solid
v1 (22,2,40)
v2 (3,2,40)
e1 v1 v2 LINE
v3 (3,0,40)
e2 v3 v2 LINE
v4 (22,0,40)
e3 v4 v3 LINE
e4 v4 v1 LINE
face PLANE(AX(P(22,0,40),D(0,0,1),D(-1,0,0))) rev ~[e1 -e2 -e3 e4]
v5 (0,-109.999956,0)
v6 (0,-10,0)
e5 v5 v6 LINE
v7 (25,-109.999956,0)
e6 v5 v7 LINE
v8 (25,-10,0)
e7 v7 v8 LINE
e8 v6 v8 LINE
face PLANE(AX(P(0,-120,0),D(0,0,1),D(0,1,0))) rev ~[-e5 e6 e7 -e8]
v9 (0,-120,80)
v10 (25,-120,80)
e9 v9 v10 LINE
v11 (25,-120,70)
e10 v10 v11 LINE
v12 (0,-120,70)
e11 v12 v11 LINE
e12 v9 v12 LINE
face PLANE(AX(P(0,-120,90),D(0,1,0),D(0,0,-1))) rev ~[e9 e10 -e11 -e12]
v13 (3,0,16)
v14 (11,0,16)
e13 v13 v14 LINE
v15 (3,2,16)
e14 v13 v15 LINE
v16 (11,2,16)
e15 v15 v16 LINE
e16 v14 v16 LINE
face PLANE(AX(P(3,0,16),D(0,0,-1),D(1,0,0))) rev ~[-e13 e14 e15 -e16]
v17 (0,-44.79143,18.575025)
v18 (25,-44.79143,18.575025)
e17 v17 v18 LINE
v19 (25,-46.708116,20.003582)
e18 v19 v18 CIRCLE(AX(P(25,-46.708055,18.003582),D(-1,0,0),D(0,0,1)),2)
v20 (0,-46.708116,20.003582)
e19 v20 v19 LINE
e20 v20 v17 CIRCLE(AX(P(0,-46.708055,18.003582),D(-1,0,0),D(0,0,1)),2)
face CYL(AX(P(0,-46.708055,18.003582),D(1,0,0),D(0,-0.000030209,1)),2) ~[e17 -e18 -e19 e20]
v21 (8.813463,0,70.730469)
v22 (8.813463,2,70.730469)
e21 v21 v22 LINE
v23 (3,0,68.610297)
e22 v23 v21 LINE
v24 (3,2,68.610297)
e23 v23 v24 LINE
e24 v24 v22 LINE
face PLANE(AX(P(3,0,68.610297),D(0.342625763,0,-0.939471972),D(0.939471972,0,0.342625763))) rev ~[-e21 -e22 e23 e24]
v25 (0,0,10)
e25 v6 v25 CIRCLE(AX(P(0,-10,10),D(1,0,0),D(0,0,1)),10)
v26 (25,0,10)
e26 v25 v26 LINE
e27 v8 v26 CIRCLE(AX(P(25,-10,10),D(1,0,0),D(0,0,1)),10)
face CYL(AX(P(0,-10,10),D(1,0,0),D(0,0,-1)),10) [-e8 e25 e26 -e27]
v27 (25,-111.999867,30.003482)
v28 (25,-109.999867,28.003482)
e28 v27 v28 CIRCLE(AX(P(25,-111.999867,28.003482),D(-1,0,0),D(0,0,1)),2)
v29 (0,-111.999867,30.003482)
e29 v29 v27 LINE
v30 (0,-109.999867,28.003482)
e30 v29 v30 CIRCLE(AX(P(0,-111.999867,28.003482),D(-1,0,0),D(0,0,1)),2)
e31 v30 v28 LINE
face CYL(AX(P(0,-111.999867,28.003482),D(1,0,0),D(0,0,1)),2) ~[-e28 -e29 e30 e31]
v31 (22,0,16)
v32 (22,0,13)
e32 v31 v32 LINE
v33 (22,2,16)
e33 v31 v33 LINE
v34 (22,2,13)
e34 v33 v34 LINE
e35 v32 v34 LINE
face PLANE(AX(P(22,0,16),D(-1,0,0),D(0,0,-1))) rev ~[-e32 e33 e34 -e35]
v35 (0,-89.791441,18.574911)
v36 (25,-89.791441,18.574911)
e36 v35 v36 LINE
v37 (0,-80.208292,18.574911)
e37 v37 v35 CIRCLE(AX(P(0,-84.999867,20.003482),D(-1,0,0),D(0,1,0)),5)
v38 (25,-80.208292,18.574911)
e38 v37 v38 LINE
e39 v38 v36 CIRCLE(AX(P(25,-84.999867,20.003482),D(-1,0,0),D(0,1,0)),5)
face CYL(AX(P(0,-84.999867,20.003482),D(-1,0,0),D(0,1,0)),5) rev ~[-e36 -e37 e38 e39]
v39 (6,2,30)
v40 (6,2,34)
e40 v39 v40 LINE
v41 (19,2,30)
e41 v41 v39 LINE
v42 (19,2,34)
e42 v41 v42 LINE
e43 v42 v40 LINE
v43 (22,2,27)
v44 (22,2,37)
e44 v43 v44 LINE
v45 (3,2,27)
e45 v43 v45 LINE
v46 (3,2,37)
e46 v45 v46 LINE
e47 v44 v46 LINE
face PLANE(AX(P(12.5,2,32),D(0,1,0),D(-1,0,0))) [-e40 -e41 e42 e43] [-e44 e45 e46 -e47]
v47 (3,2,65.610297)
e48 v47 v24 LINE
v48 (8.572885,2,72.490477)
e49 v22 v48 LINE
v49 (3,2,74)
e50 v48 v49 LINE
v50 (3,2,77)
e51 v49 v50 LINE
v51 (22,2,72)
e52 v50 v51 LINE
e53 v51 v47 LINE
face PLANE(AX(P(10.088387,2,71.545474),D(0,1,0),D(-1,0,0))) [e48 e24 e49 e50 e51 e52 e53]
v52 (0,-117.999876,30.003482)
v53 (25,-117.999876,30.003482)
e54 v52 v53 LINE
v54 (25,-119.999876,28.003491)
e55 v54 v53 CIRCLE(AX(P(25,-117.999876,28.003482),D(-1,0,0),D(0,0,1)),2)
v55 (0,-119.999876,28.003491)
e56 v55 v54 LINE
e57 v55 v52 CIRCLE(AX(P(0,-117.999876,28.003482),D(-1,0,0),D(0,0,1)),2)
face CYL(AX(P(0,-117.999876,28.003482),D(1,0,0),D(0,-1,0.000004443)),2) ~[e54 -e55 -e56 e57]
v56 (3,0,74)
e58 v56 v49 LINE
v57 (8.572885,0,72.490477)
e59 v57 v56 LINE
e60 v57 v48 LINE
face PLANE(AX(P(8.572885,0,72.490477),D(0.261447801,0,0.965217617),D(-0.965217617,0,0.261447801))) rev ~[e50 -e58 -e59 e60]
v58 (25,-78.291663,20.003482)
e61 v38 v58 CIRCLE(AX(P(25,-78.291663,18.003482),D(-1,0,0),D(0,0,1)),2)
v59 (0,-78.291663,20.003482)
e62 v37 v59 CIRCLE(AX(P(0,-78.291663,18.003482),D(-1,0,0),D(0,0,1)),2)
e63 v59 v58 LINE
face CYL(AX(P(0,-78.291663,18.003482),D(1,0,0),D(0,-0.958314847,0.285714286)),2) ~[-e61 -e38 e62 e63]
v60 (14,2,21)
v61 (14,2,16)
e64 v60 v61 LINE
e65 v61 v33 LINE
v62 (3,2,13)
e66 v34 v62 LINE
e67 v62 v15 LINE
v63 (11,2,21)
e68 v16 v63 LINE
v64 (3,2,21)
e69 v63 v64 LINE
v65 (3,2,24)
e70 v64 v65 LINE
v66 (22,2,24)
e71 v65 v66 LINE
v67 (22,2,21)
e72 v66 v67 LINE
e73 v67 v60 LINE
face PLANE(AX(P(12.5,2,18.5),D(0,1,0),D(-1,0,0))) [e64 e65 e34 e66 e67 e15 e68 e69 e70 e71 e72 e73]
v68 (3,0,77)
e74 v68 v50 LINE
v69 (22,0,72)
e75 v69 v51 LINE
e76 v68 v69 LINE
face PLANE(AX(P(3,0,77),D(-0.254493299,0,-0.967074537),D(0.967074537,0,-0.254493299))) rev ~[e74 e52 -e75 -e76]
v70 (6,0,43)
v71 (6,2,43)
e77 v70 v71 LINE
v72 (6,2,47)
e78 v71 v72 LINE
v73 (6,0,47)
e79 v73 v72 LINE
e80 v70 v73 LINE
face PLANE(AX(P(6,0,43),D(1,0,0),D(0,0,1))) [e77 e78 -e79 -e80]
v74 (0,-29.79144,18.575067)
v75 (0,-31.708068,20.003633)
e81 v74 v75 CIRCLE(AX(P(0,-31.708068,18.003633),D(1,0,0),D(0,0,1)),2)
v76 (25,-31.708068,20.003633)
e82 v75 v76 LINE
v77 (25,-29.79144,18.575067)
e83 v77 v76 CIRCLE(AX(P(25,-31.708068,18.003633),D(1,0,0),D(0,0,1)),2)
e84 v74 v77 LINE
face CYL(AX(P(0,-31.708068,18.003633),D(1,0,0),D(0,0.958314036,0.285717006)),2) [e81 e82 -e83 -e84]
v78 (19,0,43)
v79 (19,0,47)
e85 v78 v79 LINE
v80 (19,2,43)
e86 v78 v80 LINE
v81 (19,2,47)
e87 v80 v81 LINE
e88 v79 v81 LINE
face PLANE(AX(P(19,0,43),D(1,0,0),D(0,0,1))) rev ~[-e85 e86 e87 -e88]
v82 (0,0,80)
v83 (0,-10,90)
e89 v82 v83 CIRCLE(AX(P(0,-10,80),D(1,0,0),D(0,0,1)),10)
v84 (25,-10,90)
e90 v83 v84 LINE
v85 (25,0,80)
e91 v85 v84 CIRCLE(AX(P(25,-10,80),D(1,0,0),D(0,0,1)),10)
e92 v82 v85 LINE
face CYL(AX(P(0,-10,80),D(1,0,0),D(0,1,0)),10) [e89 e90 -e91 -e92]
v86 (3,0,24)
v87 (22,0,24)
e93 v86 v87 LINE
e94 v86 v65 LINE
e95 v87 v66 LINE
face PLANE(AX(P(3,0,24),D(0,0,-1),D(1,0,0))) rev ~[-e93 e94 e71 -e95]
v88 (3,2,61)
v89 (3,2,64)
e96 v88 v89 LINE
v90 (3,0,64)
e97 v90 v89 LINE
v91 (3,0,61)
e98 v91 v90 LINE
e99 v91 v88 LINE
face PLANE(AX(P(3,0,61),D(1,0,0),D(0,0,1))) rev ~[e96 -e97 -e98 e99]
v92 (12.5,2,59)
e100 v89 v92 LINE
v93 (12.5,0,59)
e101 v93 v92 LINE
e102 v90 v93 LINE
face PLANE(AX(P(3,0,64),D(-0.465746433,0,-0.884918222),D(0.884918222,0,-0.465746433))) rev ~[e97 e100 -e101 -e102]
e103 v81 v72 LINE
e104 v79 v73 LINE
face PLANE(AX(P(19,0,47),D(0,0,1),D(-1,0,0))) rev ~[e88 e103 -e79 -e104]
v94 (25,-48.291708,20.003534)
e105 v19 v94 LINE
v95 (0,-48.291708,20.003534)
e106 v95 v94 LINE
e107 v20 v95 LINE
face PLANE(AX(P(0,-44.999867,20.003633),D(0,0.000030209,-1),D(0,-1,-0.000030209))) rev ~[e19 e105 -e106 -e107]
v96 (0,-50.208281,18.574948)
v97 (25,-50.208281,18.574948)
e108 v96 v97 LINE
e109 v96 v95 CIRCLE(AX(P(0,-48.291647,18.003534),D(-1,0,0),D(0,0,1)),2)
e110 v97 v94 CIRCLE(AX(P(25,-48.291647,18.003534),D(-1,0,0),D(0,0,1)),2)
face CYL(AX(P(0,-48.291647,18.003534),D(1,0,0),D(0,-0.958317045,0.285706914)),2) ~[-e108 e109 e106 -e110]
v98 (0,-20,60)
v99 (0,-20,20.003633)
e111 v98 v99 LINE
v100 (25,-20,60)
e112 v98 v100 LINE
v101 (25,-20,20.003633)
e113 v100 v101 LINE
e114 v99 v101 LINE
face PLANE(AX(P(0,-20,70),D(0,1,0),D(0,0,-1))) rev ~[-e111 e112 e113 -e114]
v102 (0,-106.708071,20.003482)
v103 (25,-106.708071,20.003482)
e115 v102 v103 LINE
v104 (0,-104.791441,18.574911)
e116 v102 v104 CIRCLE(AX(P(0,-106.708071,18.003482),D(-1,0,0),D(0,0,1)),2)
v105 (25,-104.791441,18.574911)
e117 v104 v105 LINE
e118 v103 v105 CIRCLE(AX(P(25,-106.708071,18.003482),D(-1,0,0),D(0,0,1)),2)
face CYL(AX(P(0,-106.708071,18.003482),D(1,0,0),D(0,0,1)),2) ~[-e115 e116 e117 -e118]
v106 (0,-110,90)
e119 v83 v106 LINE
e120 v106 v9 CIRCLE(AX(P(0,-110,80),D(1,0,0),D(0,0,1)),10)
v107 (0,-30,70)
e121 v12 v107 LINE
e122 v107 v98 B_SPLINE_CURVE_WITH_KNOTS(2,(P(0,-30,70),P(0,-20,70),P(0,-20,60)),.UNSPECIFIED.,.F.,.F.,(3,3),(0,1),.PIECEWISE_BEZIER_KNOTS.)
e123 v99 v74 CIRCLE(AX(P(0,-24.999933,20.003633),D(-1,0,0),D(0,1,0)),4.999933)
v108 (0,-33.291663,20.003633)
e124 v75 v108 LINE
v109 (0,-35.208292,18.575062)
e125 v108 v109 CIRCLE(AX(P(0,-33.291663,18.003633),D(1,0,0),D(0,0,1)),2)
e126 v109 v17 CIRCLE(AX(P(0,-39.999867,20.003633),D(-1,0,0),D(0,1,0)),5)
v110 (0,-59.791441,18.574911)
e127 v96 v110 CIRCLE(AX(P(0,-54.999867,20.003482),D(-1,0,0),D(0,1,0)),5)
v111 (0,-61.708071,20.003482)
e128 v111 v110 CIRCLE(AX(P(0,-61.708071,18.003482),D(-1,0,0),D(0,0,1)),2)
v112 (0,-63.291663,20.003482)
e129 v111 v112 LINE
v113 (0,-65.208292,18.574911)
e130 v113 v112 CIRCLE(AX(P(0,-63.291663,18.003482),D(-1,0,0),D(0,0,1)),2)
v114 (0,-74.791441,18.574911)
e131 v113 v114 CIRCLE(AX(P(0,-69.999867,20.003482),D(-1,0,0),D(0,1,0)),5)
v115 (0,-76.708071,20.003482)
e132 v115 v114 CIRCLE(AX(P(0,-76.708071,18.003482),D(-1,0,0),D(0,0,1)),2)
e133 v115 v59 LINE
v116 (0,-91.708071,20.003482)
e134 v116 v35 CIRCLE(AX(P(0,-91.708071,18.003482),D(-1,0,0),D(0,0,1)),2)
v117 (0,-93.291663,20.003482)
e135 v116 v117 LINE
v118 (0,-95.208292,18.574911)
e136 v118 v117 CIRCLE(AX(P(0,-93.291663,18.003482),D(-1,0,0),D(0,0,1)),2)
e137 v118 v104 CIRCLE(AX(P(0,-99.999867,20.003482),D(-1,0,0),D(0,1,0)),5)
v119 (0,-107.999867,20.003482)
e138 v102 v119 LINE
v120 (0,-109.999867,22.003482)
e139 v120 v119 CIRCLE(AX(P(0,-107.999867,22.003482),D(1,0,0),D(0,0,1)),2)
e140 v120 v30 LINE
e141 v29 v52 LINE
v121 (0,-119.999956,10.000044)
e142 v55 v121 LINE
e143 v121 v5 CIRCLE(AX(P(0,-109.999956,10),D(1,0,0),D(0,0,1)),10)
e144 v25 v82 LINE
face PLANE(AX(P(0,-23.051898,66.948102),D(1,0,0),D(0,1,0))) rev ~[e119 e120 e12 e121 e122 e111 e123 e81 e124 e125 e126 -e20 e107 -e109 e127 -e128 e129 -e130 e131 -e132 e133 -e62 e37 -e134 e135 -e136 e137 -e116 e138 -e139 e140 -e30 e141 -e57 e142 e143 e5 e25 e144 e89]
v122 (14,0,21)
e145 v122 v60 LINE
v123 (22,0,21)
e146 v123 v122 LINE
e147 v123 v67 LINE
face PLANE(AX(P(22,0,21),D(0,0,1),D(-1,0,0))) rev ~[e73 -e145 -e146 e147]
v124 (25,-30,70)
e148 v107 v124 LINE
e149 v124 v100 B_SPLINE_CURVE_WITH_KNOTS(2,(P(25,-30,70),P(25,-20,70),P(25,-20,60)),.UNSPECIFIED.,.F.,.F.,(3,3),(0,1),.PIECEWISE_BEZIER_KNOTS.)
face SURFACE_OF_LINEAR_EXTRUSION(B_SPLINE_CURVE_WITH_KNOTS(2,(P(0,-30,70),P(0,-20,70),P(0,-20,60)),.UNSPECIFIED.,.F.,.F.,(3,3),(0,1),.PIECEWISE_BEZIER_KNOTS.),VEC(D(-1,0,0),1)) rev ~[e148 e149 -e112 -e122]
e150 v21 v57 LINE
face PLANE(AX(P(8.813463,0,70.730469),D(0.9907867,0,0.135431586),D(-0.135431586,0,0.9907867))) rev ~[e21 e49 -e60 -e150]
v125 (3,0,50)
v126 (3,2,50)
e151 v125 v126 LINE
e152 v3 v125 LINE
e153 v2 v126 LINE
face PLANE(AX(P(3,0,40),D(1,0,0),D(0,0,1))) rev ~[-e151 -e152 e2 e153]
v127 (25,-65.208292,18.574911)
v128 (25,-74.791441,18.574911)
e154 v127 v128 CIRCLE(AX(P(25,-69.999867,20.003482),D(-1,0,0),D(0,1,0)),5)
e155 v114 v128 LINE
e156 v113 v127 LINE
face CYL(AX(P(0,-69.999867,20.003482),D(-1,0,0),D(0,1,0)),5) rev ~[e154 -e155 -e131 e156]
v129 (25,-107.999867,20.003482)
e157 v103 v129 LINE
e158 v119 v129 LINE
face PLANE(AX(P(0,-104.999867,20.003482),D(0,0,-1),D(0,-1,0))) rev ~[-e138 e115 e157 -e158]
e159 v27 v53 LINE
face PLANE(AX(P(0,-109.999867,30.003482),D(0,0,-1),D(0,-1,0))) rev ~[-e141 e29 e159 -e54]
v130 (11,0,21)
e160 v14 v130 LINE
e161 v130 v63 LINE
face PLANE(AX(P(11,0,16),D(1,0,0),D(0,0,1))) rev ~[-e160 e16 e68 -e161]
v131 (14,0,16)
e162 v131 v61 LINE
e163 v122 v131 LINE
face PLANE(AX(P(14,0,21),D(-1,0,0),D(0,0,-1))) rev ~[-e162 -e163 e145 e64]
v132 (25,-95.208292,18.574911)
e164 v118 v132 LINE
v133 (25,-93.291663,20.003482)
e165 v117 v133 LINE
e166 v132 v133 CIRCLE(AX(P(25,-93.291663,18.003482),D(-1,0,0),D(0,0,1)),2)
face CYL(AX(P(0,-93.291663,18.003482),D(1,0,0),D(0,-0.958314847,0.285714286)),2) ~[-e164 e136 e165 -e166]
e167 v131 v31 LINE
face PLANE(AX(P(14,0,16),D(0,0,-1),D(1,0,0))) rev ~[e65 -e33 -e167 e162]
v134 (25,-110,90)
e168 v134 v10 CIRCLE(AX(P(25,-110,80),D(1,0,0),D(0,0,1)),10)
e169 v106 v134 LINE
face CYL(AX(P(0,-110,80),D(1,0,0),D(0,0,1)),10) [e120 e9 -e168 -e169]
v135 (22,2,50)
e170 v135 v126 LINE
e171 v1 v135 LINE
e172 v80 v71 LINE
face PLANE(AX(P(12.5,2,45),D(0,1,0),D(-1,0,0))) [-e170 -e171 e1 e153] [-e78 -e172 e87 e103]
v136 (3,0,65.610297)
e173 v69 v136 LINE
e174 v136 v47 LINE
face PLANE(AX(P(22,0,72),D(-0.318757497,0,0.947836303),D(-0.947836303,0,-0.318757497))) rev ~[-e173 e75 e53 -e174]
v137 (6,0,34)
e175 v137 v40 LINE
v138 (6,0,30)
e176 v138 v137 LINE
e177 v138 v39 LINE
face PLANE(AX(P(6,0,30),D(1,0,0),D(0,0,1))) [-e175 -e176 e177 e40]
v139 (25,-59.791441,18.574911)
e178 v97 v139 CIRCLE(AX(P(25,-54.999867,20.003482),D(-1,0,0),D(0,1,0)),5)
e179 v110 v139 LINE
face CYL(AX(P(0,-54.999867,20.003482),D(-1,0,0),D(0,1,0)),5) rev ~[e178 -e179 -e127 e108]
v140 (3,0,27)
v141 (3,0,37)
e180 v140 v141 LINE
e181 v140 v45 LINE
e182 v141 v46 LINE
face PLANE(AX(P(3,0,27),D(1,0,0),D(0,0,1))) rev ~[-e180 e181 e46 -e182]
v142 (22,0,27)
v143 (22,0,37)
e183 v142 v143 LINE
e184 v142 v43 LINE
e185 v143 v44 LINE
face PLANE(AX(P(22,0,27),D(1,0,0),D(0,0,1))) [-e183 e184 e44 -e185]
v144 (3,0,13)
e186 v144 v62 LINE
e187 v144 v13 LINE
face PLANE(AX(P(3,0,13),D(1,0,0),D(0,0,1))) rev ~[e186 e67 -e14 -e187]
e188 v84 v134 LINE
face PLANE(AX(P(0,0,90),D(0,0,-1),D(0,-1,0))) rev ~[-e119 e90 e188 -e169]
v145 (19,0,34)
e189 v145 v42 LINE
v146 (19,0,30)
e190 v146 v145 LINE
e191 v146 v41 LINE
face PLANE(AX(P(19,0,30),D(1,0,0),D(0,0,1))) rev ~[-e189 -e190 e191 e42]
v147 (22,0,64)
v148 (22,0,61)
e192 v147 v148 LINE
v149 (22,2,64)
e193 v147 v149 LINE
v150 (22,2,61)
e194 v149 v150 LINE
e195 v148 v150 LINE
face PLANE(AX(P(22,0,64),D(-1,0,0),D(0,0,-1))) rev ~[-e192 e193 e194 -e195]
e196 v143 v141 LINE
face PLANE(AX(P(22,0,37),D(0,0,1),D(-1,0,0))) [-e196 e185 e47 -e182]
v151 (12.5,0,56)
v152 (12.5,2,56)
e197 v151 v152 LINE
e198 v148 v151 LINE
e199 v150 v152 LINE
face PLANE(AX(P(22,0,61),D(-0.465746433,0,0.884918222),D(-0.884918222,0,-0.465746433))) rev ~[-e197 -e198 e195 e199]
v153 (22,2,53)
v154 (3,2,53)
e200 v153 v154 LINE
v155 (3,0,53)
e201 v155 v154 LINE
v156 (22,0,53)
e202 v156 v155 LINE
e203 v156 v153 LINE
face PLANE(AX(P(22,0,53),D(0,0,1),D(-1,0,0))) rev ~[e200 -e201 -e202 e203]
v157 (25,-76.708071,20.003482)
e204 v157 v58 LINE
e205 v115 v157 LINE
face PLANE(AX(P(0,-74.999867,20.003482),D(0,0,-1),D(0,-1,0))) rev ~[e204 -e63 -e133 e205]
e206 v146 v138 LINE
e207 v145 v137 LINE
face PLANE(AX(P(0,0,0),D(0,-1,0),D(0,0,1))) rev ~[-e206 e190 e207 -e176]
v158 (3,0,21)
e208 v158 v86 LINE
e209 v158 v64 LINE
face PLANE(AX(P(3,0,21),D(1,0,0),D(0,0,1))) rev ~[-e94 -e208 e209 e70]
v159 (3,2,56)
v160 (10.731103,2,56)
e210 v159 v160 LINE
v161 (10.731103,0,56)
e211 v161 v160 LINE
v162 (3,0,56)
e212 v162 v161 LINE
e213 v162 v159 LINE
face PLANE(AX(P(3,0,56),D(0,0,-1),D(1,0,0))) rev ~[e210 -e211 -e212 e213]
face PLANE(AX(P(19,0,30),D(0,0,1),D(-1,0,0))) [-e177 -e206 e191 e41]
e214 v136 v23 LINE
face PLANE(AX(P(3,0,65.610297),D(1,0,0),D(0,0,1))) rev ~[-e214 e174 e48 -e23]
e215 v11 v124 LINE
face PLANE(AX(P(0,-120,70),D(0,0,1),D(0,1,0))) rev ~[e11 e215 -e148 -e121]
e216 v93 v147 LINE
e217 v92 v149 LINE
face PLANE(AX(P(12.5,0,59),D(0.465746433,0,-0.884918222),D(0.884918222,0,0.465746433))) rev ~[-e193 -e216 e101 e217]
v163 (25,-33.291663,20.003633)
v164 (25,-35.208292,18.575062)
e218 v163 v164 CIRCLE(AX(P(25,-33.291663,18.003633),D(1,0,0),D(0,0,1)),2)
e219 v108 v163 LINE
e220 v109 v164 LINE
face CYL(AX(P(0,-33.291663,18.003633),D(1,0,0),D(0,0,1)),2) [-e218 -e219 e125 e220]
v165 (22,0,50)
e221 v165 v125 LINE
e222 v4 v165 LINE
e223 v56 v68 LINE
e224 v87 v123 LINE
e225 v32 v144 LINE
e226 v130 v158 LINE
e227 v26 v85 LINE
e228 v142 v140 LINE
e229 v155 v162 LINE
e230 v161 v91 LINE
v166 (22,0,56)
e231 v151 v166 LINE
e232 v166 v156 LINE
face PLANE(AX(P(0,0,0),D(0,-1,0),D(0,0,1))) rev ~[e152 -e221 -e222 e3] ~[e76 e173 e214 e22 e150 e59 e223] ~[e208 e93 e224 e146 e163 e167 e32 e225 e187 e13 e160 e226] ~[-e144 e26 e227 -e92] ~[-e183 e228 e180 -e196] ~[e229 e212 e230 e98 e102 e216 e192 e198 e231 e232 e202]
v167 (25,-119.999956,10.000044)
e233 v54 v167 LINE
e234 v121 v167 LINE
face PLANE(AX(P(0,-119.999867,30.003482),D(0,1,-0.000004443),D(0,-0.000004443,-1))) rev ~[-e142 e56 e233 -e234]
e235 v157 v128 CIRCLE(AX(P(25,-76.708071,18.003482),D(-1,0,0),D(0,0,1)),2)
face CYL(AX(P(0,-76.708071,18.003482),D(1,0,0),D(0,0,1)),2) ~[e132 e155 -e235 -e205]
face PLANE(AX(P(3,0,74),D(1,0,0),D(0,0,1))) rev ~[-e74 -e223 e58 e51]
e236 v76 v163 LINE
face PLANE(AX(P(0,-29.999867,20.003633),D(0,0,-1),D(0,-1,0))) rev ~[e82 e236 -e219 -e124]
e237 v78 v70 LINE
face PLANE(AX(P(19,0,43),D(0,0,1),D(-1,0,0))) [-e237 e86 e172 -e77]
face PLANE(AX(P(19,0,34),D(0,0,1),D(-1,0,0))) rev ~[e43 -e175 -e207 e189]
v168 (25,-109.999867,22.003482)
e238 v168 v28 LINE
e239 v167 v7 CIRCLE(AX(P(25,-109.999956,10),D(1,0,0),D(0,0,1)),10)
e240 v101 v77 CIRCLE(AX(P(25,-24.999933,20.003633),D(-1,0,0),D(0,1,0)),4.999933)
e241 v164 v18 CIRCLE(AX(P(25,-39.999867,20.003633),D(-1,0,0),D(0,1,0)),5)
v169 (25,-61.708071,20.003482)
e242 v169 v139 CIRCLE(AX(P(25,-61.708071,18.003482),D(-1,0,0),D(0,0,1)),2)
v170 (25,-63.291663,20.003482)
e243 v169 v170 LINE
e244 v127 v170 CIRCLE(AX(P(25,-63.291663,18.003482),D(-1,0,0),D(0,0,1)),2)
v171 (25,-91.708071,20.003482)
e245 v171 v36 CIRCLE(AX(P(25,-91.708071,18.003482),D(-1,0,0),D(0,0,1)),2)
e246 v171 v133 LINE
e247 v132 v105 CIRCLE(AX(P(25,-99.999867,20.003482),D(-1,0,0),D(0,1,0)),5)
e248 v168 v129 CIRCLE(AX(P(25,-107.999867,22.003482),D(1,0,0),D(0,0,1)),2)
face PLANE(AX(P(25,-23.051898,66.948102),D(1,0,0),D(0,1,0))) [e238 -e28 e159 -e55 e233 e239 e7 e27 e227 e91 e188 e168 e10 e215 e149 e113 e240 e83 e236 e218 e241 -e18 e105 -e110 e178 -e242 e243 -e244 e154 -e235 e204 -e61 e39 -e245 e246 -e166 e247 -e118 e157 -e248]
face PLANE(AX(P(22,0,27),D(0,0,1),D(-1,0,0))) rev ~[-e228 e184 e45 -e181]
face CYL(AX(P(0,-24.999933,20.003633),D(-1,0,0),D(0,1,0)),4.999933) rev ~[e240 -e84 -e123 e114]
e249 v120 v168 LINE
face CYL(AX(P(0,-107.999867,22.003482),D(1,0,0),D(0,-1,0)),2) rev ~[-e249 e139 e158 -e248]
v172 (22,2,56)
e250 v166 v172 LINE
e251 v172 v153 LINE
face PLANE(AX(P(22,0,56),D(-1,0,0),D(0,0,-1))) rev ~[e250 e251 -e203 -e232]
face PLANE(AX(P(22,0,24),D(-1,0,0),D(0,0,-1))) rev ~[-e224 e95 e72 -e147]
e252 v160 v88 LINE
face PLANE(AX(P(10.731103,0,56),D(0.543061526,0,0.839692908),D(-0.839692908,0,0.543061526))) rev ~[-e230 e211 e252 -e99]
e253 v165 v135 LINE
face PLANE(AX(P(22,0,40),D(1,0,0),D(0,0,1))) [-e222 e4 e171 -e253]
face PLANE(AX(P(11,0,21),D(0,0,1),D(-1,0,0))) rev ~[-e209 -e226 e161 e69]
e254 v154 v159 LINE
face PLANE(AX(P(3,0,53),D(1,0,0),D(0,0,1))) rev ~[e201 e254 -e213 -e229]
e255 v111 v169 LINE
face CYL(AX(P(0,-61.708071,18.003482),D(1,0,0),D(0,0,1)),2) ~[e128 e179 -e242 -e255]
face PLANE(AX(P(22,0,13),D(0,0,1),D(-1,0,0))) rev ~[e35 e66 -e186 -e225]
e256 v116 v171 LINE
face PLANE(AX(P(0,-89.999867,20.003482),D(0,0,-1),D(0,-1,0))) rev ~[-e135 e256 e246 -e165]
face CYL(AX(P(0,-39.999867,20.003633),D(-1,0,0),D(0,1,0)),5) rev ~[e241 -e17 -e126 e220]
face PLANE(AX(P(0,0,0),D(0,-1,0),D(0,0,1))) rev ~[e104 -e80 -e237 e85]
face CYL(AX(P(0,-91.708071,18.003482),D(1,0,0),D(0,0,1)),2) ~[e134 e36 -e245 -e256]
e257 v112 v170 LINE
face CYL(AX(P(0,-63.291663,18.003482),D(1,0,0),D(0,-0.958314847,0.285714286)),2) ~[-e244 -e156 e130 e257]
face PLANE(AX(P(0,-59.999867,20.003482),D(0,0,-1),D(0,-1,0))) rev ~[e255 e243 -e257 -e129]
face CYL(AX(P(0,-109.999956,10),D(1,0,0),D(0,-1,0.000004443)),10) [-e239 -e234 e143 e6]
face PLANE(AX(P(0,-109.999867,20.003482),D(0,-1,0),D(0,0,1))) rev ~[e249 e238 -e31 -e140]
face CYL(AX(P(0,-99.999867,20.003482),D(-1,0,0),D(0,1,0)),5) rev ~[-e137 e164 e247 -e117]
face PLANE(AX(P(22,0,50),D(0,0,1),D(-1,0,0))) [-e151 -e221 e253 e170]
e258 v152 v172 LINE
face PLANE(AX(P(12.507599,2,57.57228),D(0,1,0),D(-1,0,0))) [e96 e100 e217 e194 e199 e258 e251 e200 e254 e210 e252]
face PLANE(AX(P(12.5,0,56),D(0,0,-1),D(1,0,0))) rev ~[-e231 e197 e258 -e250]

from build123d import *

# Parameters (mm, degrees)
F1_DEPTH    = 25
F2_R        = 10
F3_T1_DEPTH = 25
F4_R        = 2
F5_W        = 19
F5_H        = 10
F5_W_2      = 13
F5_H_2      = 4
F6_DEPTH    = 2


# Not quite as in the source:
# - a fillet or chamfer that OpenCascade refuses, or shapes differently, is made with other operations: its cross-section is extruded or revolved along the edge and cut away or added


with BuildPart() as f1:
    # F0 (on Right) → F1 (new body)
    with BuildSketch(Plane.YZ):
        with BuildLine():
            Line((-119.9998666872, 30.0034820876), (-120, 0))
            Line((-120, 0), (0, 0))
            Line((0, 0), (0, 90))
            Line((0, 90), (-120, 90))
            Line((-120, 90), (-120, 70))
            Line((-120, 70), (-20, 70))
            Line((-20, 70), (-20, 20.003633132))
            ThreePointArc((-20, 20.003633132), (-24.9999333448, 15.0036997872), (-29.9998666895, 20.003633132))
            Line((-29.9998666895, 20.003633132), (-34.9998666895, 20.003633132))
            ThreePointArc((-34.9998666895, 20.003633132), (-39.9998666895, 15.003633132), (-44.9998666895, 20.003633132))
            Line((-44.9998666895, 20.003633132), (-49.9998666872, 20.0034820876))
            ThreePointArc((-49.9998666872, 20.0034820876), (-54.9998666872, 15.0034820876), (-59.9998666872, 20.0034820876))
            Line((-59.9998666872, 20.0034820876), (-64.9998666872, 20.0034820876))
            ThreePointArc((-64.9998666872, 20.0034820876), (-69.9998666872, 15.0034820876), (-74.9998666872, 20.0034820876))
            Line((-74.9998666872, 20.0034820876), (-79.9998666872, 20.0034820876))
            ThreePointArc((-79.9998666872, 20.0034820876), (-84.9998666872, 15.0034820876), (-89.9998666872, 20.0034820876))
            Line((-89.9998666872, 20.0034820876), (-94.9998666872, 20.0034820876))
            ThreePointArc((-94.9998666872, 20.0034820876), (-99.9998666872, 15.0034820876), (-104.9998666872, 20.0034820876))
            Line((-104.9998666872, 20.0034820876), (-109.9998666872, 20.0034820876))
            Line((-109.9998666872, 20.0034820876), (-109.9998666872, 30.0034820876))
            Line((-109.9998666872, 30.0034820876), (-119.9998666872, 30.0034820876))
        make_face()
    extrude(amount=F1_DEPTH)

    # F2
    f2_edges = [f1.edges().sort_by_distance(p)[0] for p in [
        (12.5, -120, 90),
        (12.5, 0, 90),
        (12.5, 0, 0),
        (12.5, -120, 0),
    ]]
    fillet(f2_edges, radius=F2_R)

    # F3: fillet of radius 10 on 1 edges, made by hand

    # F3_s2 → F3_t1 (join)
    with BuildSketch(Plane.YZ):
        with BuildLine():
            add(Edge.make_bspline(
                [(-30, 70), (-20, 70), (-20, 60)],
                knots=[0, 0, 0, 1, 1, 1], degree=2, weights=[1, 1, 1]))
            Line((-20, 60), (-20, 70))
            Line((-20, 70), (-30, 70))
        make_face()
    extrude(amount=F3_T1_DEPTH)

    # F4
    f4_edges = [f1.edges().sort_by_distance(p)[0] for p in [
        (12.5, -119.999867, 30.003482),
        (12.5, -109.999867, 30.003482),
        (12.5, -109.999867, 20.003482),
        (12.5, -104.999867, 20.003482),
        (12.5, -94.999867, 20.003482),
        (12.5, -89.999867, 20.003482),
        (12.5, -79.999867, 20.003482),
        (12.5, -74.999867, 20.003482),
        (12.5, -64.999867, 20.003482),
        (12.5, -59.999867, 20.003482),
        (12.5, -49.999867, 20.003482),
        (12.5, -44.999867, 20.003633),
        (12.5, -34.999867, 20.003633),
        (12.5, -29.999867, 20.003633),
    ]]
    fillet(f4_edges, radius=F4_R)

    # F5 (on face) → F6 (join)
    with BuildSketch(Plane(origin=(0, 0, 0), x_dir=(-1, 0, 0), z_dir=(0, 1, 0))):
        Polygon((-22, 16), (-22, 13), (-3, 13), (-3, 16), (-11, 16), (-11, 21), (-3, 21), (-3, 24), (-22, 24), (-22, 21), (-14, 21), (-14, 16), align=None)
        with Locations((-12.5, 32)):
            Rectangle(F5_W, F5_H)
        with Locations((-12.5, 32)):
            Rectangle(F5_W_2, F5_H_2, mode=Mode.SUBTRACT)
        with Locations((-12.5, 45)):
            Rectangle(F5_W, F5_H)
        with Locations((-12.5, 45)):
            Rectangle(F5_W_2, F5_H_2, mode=Mode.SUBTRACT)
        Polygon((-22, 56), (-22, 53), (-3, 53), (-3, 56), (-10.7311028987, 56), (-3, 61), (-3, 64), (-12.5, 59), (-22, 64), (-22, 61), (-12.5, 56), align=None)
        Polygon((-22, 72), (-3, 65.6102970243), (-3, 68.6102970243), (-8.8134625163, 70.7304688778), (-8.5728853775, 72.4904765496), (-3, 74), (-3, 77), align=None)
    extrude(amount=F6_DEPTH)


solid = f1.part
